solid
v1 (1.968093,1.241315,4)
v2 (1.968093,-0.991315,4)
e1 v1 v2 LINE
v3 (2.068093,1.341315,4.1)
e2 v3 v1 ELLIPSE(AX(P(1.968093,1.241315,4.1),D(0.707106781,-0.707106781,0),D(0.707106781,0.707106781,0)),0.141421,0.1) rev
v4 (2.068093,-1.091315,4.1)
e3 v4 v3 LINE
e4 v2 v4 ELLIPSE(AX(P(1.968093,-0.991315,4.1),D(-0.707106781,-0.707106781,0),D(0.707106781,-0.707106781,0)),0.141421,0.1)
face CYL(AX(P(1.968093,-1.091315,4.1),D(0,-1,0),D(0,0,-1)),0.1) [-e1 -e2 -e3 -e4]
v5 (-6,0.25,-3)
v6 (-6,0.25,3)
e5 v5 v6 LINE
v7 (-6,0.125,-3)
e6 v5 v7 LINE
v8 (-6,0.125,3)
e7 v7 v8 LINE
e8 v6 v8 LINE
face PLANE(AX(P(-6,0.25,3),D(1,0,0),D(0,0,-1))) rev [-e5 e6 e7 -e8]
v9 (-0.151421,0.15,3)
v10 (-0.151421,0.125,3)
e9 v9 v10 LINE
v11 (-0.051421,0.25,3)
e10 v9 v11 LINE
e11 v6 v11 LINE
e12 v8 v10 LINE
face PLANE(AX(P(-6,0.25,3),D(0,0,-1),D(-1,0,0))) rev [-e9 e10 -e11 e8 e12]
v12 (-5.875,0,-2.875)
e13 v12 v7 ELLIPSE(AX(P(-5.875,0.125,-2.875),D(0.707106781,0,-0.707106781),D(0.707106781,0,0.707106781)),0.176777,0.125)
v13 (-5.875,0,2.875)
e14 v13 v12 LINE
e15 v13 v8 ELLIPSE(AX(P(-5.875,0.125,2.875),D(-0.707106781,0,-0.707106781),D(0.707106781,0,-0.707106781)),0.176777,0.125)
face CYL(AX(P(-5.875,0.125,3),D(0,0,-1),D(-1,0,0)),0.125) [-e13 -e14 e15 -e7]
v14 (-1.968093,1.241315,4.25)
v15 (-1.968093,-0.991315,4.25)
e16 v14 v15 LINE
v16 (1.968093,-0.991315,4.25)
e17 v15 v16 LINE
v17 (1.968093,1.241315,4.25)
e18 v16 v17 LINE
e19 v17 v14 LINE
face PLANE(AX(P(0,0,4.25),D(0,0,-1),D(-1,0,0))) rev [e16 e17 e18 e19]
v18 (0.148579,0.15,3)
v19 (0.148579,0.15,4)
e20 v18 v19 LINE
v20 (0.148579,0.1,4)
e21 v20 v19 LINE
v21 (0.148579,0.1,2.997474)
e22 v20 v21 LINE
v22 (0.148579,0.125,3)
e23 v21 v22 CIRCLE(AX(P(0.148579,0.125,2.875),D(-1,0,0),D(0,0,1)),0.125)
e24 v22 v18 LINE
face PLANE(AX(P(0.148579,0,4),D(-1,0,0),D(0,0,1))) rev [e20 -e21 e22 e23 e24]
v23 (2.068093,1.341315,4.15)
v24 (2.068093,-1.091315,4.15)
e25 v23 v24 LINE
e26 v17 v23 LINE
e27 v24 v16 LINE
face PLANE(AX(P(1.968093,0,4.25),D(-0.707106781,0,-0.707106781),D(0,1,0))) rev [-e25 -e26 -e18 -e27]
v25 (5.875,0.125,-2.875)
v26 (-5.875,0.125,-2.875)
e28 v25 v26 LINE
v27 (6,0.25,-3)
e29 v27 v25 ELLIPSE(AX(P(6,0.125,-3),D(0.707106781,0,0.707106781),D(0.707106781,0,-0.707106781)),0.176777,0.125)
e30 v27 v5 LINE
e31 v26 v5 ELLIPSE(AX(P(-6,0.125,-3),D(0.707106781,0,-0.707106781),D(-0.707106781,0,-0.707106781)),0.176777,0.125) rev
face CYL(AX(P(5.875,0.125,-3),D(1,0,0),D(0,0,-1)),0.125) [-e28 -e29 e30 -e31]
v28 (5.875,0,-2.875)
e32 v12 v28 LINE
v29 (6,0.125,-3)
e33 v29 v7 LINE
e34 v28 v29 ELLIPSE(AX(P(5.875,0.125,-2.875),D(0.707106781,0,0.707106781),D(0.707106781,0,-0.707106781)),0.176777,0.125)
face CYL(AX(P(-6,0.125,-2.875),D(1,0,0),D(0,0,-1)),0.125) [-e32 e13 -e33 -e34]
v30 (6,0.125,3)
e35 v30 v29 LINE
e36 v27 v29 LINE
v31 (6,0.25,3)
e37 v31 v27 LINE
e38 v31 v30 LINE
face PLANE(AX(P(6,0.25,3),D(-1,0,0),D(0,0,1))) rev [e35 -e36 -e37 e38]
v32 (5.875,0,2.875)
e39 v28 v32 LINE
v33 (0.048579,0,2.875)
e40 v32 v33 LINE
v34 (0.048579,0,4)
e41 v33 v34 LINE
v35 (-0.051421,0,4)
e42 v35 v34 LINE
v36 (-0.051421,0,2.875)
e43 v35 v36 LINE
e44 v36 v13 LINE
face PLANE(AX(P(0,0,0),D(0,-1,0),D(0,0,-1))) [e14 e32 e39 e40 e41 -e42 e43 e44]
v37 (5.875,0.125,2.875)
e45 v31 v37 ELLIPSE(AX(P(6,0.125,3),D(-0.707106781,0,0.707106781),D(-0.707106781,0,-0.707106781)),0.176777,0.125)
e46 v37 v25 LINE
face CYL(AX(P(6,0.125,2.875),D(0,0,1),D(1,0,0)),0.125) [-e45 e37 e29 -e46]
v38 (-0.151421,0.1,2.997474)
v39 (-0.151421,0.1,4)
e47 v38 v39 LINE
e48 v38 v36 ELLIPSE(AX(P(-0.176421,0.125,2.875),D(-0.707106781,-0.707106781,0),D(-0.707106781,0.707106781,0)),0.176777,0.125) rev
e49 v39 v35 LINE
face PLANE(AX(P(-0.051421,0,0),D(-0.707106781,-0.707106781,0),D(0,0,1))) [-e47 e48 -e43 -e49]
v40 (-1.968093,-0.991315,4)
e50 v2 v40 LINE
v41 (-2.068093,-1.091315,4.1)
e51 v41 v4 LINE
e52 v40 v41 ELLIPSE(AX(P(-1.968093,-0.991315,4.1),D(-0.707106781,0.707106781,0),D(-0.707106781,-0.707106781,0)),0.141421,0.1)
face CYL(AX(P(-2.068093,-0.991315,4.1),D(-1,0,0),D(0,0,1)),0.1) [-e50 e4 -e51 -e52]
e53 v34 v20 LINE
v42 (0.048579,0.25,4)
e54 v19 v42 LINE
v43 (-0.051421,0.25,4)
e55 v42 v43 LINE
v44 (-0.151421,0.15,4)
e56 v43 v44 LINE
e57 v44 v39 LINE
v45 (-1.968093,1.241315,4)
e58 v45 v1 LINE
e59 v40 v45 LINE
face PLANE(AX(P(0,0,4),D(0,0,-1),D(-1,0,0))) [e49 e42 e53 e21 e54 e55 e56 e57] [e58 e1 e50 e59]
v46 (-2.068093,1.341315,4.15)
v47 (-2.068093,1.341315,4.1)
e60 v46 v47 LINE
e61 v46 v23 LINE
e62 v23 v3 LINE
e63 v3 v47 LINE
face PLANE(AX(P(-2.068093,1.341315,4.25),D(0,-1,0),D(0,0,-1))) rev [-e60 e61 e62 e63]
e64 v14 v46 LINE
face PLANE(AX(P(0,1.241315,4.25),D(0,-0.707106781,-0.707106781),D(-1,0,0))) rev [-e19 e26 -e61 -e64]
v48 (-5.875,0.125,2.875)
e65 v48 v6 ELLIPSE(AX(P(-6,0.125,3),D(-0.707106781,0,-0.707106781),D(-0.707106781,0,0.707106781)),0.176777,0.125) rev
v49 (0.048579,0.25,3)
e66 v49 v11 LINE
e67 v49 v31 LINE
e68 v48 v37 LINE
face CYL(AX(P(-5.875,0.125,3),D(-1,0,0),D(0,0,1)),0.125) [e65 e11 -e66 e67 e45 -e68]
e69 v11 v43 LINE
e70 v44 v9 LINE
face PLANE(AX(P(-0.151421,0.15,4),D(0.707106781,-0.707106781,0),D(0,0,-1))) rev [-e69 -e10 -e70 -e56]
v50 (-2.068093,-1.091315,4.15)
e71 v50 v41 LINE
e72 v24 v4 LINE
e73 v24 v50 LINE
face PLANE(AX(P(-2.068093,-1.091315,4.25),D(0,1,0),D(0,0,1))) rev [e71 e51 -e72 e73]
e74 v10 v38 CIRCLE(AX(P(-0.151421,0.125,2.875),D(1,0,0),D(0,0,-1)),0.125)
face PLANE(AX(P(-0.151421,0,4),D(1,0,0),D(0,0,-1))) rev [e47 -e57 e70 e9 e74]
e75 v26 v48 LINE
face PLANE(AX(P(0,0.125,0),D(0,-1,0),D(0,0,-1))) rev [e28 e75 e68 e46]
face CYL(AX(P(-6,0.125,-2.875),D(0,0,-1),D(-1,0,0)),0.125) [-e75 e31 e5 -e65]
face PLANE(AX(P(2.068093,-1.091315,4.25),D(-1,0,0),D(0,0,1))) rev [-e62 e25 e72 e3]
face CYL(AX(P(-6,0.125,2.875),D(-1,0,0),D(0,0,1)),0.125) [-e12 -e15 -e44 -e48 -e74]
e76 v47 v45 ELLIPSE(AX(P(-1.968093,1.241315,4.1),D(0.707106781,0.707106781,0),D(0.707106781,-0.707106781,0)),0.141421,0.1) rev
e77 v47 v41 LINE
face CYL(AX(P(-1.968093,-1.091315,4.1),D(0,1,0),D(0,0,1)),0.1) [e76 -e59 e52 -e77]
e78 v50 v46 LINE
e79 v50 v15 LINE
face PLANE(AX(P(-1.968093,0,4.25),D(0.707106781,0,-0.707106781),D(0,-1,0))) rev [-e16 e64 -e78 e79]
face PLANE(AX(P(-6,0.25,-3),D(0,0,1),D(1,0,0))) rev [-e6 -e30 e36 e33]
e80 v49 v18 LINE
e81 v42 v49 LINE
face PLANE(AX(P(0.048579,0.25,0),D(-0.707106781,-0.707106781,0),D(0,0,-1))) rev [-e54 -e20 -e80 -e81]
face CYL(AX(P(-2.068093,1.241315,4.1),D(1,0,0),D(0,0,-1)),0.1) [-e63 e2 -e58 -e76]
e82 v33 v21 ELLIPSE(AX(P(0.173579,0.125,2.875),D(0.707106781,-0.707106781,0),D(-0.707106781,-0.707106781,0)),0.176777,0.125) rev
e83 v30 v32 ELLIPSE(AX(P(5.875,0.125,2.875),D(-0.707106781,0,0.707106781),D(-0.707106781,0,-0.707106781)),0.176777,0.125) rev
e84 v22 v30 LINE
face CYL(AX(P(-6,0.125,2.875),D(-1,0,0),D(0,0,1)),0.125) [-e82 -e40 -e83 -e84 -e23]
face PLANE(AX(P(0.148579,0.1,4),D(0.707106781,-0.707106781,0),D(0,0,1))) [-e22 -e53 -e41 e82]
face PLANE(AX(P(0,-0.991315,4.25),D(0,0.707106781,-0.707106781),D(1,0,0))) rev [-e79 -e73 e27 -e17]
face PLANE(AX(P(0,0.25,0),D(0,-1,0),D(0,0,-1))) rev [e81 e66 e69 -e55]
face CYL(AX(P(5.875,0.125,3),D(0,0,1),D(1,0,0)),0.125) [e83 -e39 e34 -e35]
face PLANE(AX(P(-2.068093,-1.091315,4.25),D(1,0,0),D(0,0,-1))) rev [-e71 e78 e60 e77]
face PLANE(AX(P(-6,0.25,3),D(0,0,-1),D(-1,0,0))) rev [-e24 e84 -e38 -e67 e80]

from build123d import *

# Parameters (mm, degrees)
SKETCH1_W           = 12
SKETCH1_H           = 6
BOSS_EXTRUDE1_DEPTH = 0.25
CUT_EXTRUDE1_DEPTH  = 0.125
SKETCH2_W           = 0.3
SKETCH2_H           = 0.25
BOSS_EXTRUDE2_DEPTH = 1
SKETCH4_W           = 4.136186254
SKETCH4_H           = 2.43263025
BOSS_EXTRUDE3_DEPTH = 0.25
FILLET2_R           = 0.1
CHAMFER1_SIZE       = 0.1
FILLET3_R           = 0.125
CHAMFER2_SIZE       = 0.1
FILLET4_R           = 0.125


with BuildPart() as part:
    # Sketch1 → Boss-Extrude1 (new body)
    with BuildSketch(Plane(origin=(0, 0, 0), x_dir=(1, 0, 0), z_dir=(0, 1, 0))):
        Rectangle(SKETCH1_W, SKETCH1_H)
    extrude(amount=BOSS_EXTRUDE1_DEPTH)

    # 3DSketch1 → Cut-Extrude1 (cut)
    with BuildSketch(Plane(origin=(-5.875, 0.25, -2.875), x_dir=(0.8982167220477767, 0, 0.43955286398082694), z_dir=(0, -1, 0))):
        Polygon((0, 0), (2.527428968, 5.164746152), (13.081475452, 0), (10.554046484, -5.164746152), align=None)
    extrude(amount=CUT_EXTRUDE1_DEPTH, mode=Mode.SUBTRACT)

    # Sketch2 → Boss-Extrude2 (add)
    with BuildSketch(Plane.XY.offset(3)):
        with Locations((-0.001421044, 0.125)):
            Rectangle(SKETCH2_W, SKETCH2_H)
    extrude(amount=BOSS_EXTRUDE2_DEPTH)

    # Sketch4 → Boss-Extrude3 (add)
    with BuildSketch(Plane.XY.offset(4)):
        with Locations((0, 0.125)):
            Rectangle(SKETCH4_W, SKETCH4_H)
    extrude(amount=BOSS_EXTRUDE3_DEPTH)

    # Fillet2
    fillet2_edges = [part.edges().sort_by_distance(p)[0] for p in [
        (2.068093127, 0.125, 4),
        (0, 1.341315125, 4),
        (-2.068093127, 0.125, 4),
        (0, -1.091315125, 4),
    ]]
    fillet(fillet2_edges, radius=FILLET2_R)

    # Chamfer1
    chamfer1_edges = [part.edges().sort_by_distance(p)[0] for p in [
        (2.068093127, 0.125, 4.25),
        (0, 1.341315125, 4.25),
        (-2.068093127, 0.125, 4.25),
        (0, -1.091315125, 4.25),
    ]]
    chamfer(chamfer1_edges, length=CHAMFER1_SIZE)

    # Fillet3
    fillet3_edges = [part.edges().sort_by_distance(p)[0] for p in [
        (0, 0.25, 2.875),
        (-5.875, 0.25, 0),
        (0, 0.25, -2.875),
        (5.875, 0.25, 0),
    ]]
    fillet(fillet3_edges, radius=FILLET3_R - 0.0001)  # a hair under: the kernel refuses the full size

    # Chamfer2
    chamfer2_edges = [part.edges().sort_by_distance(p)[0] for p in [
        (0.148578956, 0, 3.5),
        (0.148578956, 0.25, 3.5),
        (-0.151421044, 0.25, 3.5),
        (-0.151421044, 0, 3.5),
    ]]
    chamfer(chamfer2_edges, length=CHAMFER2_SIZE)

    # Fillet4
    fillet4_edges = [part.edges().sort_by_distance(p)[0] for p in [
        (6, 0, 0),
        (3.024289478, 0, 3),
        (-3.025710522, 0, 3),
        (-6, 0, 0),
        (0, 0, -3),
    ]]
    fillet(fillet4_edges, radius=FILLET4_R)


solid = part.part
